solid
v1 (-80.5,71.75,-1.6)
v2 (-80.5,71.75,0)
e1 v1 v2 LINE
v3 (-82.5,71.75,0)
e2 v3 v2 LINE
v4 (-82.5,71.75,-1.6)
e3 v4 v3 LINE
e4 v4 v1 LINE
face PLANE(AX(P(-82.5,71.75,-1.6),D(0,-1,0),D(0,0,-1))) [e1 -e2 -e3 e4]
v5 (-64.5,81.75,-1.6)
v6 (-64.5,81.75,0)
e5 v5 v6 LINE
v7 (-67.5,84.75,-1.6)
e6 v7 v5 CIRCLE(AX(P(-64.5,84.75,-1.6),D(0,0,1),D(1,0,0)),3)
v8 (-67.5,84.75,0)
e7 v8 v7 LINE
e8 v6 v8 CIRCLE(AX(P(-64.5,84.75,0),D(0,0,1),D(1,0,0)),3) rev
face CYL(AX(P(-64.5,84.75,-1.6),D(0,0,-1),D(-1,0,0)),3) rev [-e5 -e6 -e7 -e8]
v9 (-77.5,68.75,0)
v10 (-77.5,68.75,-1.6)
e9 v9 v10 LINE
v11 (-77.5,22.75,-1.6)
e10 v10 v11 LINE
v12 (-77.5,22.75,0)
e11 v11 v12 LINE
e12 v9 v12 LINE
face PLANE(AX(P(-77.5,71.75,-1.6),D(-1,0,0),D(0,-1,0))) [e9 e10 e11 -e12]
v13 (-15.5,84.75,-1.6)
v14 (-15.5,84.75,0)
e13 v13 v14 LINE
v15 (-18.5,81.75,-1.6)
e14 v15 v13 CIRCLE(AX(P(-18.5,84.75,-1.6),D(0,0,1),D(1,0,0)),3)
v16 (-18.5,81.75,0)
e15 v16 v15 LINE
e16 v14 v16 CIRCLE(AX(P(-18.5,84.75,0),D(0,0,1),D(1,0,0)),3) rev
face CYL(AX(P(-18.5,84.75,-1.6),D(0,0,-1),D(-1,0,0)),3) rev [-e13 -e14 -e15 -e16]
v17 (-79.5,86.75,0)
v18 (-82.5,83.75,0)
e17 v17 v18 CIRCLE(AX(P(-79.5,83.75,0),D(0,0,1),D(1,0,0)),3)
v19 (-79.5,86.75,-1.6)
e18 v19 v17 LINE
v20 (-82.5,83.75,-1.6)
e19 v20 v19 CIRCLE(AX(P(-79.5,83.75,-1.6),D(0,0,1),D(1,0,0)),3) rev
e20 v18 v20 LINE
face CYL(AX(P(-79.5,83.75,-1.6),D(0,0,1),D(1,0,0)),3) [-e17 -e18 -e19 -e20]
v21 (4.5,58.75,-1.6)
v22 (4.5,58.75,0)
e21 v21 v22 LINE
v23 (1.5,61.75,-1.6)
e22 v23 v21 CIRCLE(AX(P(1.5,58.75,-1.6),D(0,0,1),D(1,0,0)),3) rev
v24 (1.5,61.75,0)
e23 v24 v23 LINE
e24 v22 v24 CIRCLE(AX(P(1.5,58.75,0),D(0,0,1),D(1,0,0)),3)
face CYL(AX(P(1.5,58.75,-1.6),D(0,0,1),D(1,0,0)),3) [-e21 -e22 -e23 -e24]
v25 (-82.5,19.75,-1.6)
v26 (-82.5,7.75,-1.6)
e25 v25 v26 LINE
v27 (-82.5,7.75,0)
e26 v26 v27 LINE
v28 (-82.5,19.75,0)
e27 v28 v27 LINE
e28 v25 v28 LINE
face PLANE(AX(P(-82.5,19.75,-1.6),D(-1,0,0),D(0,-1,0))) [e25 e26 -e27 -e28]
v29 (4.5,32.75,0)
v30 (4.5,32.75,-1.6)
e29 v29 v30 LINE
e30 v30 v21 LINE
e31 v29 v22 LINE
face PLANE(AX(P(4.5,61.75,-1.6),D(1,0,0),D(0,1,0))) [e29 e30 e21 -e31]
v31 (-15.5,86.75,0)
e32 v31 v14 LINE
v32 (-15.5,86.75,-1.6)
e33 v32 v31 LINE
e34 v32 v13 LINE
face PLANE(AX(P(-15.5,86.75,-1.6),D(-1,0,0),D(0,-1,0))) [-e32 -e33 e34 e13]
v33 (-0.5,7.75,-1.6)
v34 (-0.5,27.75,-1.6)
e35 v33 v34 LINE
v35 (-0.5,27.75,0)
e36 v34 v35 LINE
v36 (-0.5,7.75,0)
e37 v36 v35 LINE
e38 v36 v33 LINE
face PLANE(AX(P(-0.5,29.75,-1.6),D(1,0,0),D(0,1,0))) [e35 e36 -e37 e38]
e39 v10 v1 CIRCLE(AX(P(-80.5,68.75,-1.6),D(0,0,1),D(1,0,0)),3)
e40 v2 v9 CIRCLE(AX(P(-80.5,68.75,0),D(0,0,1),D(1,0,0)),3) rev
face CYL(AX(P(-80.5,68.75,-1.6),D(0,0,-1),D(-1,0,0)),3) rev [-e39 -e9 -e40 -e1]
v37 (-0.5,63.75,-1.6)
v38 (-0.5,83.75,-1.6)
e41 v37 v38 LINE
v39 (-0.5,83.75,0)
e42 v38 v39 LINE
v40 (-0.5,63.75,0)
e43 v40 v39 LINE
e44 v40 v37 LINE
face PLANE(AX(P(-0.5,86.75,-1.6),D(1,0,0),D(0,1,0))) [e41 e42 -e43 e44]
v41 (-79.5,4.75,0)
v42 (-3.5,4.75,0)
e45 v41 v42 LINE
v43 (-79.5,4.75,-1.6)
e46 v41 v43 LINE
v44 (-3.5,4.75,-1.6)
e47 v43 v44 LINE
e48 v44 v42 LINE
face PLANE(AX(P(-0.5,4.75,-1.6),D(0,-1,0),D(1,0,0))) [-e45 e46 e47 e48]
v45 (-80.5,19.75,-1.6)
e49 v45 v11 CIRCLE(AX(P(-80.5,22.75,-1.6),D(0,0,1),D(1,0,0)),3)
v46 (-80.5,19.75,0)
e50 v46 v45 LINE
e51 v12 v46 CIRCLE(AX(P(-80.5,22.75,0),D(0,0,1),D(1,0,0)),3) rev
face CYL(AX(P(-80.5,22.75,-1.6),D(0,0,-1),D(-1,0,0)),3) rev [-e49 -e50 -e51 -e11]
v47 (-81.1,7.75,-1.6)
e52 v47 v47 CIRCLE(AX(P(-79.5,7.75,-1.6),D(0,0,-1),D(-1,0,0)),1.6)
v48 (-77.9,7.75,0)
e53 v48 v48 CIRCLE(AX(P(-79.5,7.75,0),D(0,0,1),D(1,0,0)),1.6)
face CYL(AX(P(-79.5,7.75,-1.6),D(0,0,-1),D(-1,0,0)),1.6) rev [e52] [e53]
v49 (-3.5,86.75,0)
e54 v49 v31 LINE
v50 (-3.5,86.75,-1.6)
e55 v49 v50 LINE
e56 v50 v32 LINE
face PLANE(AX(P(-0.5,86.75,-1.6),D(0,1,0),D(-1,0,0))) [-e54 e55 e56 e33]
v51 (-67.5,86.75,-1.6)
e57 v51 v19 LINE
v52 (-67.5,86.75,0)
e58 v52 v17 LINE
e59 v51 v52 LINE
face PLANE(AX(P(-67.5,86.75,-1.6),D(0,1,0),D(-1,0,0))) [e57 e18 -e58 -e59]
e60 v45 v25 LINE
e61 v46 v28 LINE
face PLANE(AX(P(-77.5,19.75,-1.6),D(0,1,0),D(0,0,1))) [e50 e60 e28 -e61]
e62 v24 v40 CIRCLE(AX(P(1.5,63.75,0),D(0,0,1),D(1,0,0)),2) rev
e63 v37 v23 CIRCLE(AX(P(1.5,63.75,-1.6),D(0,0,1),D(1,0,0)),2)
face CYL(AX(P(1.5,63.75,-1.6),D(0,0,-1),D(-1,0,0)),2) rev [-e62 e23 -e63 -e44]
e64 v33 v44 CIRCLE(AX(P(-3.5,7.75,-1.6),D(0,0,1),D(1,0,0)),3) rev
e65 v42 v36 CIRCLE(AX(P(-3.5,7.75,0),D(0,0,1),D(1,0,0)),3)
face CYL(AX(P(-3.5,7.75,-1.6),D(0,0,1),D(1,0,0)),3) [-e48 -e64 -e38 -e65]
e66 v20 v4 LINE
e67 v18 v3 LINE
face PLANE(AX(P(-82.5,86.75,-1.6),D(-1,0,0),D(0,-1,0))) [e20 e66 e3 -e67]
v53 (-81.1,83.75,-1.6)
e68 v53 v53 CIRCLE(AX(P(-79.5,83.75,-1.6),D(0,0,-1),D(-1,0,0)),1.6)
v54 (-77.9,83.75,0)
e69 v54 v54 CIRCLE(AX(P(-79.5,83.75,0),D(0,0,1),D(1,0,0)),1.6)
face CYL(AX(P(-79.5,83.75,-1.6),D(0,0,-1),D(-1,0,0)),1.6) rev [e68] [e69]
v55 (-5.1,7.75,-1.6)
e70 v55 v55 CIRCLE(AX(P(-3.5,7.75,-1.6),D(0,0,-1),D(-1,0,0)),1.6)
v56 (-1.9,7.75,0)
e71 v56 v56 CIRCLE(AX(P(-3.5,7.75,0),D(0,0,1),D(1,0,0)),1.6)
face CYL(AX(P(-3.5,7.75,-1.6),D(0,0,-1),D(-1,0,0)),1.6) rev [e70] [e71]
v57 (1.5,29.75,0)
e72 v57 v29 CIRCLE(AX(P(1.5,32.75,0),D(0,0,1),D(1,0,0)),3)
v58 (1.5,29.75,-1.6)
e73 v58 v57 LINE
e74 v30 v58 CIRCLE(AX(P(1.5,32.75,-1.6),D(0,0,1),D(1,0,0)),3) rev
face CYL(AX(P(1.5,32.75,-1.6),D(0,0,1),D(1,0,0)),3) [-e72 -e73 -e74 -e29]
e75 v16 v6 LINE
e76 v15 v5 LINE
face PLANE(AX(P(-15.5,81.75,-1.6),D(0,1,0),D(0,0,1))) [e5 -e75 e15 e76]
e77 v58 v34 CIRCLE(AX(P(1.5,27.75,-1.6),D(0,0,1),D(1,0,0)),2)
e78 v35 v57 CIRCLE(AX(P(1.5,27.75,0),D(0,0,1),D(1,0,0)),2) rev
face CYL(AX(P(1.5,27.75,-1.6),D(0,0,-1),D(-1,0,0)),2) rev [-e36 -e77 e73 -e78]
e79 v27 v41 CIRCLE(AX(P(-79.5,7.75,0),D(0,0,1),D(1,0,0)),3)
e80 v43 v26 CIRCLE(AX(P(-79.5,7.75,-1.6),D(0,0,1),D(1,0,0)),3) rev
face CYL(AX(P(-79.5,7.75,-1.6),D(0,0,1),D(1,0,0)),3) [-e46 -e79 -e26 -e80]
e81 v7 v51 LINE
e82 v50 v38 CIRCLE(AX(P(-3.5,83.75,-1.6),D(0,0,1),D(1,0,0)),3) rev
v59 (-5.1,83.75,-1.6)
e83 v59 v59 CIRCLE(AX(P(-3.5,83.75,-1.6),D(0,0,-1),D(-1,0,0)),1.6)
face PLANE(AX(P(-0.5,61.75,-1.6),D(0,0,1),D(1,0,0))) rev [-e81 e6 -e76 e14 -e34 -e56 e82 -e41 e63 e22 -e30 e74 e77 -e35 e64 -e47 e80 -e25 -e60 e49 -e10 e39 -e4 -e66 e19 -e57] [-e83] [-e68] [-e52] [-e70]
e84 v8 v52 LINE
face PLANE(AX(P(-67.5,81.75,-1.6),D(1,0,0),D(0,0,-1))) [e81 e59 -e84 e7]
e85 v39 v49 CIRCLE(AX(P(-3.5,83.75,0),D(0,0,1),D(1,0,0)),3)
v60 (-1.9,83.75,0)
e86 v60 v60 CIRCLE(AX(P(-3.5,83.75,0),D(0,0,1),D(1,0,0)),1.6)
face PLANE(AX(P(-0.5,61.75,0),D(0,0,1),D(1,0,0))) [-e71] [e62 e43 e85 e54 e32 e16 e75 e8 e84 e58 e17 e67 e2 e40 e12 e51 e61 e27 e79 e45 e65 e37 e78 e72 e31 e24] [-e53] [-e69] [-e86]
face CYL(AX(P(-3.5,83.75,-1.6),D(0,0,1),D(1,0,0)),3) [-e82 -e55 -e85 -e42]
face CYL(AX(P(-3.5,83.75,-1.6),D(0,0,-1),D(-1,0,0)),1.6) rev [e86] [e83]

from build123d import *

# Parameters (mm, degrees)
BOSS_EXTRUDE1_DEPTH        = 1.6
F_3_2_3_2_DIAMETER_HOLE1_D = 3.2
FILLET1_R                  = 3
FILLET3_R                  = 2


with BuildPart() as part:
    # Sketch1 → Boss-Extrude1 (new body)
    with BuildSketch(Plane.XY):
        Polygon((-15.5, 86.75), (-15.5, 81.75), (-67.5, 81.75), (-67.5, 86.75), (-82.5, 86.75), (-82.5, 71.75), (-77.5, 71.75), (-77.5, 19.75), (-82.5, 19.75), (-82.5, 4.75), (-0.5, 4.75), (-0.5, 29.75), (4.5, 29.75), (4.5, 61.75), (-0.5, 61.75), (-0.5, 86.75), align=None)
    extrude(amount=-BOSS_EXTRUDE1_DEPTH)

    # Ø3.2 (3.2) Diameter Hole1 (through all)
    with Locations(Plane(origin=(0, 0, -1.6), x_dir=(-1, 0, 0), z_dir=(0, 0, -1))):
        with Locations((3.5, 83.75), (3.5, 7.75), (79.5, 7.75), (79.5, 83.75)):
            Hole(F_3_2_3_2_DIAMETER_HOLE1_D / 2)

    # Fillet1
    fillet1_edges = [part.edges().sort_by_distance(p)[0] for p in [
        (4.5, 61.75, -0.8),
        (4.5, 29.75, -0.8),
        (-0.5, 4.75, -0.8),
        (-82.5, 4.75, -0.8),
        (-77.5, 19.75, -0.8),
        (-77.5, 71.75, -0.8),
        (-82.5, 86.75, -0.8),
        (-67.5, 81.75, -0.8),
        (-15.5, 81.75, -0.8),
        (-0.5, 86.75, -0.8),
    ]]
    fillet(fillet1_edges, radius=FILLET1_R)

    # Fillet3
    fillet3_edges = [part.edges().sort_by_distance(p)[0] for p in [
        (-0.5, 29.75, -0.8),
        (-0.5, 61.75, -0.8),
    ]]
    fillet(fillet3_edges, radius=FILLET3_R - 0.0001)  # a hair under: the kernel refuses the full size


solid = part.part
